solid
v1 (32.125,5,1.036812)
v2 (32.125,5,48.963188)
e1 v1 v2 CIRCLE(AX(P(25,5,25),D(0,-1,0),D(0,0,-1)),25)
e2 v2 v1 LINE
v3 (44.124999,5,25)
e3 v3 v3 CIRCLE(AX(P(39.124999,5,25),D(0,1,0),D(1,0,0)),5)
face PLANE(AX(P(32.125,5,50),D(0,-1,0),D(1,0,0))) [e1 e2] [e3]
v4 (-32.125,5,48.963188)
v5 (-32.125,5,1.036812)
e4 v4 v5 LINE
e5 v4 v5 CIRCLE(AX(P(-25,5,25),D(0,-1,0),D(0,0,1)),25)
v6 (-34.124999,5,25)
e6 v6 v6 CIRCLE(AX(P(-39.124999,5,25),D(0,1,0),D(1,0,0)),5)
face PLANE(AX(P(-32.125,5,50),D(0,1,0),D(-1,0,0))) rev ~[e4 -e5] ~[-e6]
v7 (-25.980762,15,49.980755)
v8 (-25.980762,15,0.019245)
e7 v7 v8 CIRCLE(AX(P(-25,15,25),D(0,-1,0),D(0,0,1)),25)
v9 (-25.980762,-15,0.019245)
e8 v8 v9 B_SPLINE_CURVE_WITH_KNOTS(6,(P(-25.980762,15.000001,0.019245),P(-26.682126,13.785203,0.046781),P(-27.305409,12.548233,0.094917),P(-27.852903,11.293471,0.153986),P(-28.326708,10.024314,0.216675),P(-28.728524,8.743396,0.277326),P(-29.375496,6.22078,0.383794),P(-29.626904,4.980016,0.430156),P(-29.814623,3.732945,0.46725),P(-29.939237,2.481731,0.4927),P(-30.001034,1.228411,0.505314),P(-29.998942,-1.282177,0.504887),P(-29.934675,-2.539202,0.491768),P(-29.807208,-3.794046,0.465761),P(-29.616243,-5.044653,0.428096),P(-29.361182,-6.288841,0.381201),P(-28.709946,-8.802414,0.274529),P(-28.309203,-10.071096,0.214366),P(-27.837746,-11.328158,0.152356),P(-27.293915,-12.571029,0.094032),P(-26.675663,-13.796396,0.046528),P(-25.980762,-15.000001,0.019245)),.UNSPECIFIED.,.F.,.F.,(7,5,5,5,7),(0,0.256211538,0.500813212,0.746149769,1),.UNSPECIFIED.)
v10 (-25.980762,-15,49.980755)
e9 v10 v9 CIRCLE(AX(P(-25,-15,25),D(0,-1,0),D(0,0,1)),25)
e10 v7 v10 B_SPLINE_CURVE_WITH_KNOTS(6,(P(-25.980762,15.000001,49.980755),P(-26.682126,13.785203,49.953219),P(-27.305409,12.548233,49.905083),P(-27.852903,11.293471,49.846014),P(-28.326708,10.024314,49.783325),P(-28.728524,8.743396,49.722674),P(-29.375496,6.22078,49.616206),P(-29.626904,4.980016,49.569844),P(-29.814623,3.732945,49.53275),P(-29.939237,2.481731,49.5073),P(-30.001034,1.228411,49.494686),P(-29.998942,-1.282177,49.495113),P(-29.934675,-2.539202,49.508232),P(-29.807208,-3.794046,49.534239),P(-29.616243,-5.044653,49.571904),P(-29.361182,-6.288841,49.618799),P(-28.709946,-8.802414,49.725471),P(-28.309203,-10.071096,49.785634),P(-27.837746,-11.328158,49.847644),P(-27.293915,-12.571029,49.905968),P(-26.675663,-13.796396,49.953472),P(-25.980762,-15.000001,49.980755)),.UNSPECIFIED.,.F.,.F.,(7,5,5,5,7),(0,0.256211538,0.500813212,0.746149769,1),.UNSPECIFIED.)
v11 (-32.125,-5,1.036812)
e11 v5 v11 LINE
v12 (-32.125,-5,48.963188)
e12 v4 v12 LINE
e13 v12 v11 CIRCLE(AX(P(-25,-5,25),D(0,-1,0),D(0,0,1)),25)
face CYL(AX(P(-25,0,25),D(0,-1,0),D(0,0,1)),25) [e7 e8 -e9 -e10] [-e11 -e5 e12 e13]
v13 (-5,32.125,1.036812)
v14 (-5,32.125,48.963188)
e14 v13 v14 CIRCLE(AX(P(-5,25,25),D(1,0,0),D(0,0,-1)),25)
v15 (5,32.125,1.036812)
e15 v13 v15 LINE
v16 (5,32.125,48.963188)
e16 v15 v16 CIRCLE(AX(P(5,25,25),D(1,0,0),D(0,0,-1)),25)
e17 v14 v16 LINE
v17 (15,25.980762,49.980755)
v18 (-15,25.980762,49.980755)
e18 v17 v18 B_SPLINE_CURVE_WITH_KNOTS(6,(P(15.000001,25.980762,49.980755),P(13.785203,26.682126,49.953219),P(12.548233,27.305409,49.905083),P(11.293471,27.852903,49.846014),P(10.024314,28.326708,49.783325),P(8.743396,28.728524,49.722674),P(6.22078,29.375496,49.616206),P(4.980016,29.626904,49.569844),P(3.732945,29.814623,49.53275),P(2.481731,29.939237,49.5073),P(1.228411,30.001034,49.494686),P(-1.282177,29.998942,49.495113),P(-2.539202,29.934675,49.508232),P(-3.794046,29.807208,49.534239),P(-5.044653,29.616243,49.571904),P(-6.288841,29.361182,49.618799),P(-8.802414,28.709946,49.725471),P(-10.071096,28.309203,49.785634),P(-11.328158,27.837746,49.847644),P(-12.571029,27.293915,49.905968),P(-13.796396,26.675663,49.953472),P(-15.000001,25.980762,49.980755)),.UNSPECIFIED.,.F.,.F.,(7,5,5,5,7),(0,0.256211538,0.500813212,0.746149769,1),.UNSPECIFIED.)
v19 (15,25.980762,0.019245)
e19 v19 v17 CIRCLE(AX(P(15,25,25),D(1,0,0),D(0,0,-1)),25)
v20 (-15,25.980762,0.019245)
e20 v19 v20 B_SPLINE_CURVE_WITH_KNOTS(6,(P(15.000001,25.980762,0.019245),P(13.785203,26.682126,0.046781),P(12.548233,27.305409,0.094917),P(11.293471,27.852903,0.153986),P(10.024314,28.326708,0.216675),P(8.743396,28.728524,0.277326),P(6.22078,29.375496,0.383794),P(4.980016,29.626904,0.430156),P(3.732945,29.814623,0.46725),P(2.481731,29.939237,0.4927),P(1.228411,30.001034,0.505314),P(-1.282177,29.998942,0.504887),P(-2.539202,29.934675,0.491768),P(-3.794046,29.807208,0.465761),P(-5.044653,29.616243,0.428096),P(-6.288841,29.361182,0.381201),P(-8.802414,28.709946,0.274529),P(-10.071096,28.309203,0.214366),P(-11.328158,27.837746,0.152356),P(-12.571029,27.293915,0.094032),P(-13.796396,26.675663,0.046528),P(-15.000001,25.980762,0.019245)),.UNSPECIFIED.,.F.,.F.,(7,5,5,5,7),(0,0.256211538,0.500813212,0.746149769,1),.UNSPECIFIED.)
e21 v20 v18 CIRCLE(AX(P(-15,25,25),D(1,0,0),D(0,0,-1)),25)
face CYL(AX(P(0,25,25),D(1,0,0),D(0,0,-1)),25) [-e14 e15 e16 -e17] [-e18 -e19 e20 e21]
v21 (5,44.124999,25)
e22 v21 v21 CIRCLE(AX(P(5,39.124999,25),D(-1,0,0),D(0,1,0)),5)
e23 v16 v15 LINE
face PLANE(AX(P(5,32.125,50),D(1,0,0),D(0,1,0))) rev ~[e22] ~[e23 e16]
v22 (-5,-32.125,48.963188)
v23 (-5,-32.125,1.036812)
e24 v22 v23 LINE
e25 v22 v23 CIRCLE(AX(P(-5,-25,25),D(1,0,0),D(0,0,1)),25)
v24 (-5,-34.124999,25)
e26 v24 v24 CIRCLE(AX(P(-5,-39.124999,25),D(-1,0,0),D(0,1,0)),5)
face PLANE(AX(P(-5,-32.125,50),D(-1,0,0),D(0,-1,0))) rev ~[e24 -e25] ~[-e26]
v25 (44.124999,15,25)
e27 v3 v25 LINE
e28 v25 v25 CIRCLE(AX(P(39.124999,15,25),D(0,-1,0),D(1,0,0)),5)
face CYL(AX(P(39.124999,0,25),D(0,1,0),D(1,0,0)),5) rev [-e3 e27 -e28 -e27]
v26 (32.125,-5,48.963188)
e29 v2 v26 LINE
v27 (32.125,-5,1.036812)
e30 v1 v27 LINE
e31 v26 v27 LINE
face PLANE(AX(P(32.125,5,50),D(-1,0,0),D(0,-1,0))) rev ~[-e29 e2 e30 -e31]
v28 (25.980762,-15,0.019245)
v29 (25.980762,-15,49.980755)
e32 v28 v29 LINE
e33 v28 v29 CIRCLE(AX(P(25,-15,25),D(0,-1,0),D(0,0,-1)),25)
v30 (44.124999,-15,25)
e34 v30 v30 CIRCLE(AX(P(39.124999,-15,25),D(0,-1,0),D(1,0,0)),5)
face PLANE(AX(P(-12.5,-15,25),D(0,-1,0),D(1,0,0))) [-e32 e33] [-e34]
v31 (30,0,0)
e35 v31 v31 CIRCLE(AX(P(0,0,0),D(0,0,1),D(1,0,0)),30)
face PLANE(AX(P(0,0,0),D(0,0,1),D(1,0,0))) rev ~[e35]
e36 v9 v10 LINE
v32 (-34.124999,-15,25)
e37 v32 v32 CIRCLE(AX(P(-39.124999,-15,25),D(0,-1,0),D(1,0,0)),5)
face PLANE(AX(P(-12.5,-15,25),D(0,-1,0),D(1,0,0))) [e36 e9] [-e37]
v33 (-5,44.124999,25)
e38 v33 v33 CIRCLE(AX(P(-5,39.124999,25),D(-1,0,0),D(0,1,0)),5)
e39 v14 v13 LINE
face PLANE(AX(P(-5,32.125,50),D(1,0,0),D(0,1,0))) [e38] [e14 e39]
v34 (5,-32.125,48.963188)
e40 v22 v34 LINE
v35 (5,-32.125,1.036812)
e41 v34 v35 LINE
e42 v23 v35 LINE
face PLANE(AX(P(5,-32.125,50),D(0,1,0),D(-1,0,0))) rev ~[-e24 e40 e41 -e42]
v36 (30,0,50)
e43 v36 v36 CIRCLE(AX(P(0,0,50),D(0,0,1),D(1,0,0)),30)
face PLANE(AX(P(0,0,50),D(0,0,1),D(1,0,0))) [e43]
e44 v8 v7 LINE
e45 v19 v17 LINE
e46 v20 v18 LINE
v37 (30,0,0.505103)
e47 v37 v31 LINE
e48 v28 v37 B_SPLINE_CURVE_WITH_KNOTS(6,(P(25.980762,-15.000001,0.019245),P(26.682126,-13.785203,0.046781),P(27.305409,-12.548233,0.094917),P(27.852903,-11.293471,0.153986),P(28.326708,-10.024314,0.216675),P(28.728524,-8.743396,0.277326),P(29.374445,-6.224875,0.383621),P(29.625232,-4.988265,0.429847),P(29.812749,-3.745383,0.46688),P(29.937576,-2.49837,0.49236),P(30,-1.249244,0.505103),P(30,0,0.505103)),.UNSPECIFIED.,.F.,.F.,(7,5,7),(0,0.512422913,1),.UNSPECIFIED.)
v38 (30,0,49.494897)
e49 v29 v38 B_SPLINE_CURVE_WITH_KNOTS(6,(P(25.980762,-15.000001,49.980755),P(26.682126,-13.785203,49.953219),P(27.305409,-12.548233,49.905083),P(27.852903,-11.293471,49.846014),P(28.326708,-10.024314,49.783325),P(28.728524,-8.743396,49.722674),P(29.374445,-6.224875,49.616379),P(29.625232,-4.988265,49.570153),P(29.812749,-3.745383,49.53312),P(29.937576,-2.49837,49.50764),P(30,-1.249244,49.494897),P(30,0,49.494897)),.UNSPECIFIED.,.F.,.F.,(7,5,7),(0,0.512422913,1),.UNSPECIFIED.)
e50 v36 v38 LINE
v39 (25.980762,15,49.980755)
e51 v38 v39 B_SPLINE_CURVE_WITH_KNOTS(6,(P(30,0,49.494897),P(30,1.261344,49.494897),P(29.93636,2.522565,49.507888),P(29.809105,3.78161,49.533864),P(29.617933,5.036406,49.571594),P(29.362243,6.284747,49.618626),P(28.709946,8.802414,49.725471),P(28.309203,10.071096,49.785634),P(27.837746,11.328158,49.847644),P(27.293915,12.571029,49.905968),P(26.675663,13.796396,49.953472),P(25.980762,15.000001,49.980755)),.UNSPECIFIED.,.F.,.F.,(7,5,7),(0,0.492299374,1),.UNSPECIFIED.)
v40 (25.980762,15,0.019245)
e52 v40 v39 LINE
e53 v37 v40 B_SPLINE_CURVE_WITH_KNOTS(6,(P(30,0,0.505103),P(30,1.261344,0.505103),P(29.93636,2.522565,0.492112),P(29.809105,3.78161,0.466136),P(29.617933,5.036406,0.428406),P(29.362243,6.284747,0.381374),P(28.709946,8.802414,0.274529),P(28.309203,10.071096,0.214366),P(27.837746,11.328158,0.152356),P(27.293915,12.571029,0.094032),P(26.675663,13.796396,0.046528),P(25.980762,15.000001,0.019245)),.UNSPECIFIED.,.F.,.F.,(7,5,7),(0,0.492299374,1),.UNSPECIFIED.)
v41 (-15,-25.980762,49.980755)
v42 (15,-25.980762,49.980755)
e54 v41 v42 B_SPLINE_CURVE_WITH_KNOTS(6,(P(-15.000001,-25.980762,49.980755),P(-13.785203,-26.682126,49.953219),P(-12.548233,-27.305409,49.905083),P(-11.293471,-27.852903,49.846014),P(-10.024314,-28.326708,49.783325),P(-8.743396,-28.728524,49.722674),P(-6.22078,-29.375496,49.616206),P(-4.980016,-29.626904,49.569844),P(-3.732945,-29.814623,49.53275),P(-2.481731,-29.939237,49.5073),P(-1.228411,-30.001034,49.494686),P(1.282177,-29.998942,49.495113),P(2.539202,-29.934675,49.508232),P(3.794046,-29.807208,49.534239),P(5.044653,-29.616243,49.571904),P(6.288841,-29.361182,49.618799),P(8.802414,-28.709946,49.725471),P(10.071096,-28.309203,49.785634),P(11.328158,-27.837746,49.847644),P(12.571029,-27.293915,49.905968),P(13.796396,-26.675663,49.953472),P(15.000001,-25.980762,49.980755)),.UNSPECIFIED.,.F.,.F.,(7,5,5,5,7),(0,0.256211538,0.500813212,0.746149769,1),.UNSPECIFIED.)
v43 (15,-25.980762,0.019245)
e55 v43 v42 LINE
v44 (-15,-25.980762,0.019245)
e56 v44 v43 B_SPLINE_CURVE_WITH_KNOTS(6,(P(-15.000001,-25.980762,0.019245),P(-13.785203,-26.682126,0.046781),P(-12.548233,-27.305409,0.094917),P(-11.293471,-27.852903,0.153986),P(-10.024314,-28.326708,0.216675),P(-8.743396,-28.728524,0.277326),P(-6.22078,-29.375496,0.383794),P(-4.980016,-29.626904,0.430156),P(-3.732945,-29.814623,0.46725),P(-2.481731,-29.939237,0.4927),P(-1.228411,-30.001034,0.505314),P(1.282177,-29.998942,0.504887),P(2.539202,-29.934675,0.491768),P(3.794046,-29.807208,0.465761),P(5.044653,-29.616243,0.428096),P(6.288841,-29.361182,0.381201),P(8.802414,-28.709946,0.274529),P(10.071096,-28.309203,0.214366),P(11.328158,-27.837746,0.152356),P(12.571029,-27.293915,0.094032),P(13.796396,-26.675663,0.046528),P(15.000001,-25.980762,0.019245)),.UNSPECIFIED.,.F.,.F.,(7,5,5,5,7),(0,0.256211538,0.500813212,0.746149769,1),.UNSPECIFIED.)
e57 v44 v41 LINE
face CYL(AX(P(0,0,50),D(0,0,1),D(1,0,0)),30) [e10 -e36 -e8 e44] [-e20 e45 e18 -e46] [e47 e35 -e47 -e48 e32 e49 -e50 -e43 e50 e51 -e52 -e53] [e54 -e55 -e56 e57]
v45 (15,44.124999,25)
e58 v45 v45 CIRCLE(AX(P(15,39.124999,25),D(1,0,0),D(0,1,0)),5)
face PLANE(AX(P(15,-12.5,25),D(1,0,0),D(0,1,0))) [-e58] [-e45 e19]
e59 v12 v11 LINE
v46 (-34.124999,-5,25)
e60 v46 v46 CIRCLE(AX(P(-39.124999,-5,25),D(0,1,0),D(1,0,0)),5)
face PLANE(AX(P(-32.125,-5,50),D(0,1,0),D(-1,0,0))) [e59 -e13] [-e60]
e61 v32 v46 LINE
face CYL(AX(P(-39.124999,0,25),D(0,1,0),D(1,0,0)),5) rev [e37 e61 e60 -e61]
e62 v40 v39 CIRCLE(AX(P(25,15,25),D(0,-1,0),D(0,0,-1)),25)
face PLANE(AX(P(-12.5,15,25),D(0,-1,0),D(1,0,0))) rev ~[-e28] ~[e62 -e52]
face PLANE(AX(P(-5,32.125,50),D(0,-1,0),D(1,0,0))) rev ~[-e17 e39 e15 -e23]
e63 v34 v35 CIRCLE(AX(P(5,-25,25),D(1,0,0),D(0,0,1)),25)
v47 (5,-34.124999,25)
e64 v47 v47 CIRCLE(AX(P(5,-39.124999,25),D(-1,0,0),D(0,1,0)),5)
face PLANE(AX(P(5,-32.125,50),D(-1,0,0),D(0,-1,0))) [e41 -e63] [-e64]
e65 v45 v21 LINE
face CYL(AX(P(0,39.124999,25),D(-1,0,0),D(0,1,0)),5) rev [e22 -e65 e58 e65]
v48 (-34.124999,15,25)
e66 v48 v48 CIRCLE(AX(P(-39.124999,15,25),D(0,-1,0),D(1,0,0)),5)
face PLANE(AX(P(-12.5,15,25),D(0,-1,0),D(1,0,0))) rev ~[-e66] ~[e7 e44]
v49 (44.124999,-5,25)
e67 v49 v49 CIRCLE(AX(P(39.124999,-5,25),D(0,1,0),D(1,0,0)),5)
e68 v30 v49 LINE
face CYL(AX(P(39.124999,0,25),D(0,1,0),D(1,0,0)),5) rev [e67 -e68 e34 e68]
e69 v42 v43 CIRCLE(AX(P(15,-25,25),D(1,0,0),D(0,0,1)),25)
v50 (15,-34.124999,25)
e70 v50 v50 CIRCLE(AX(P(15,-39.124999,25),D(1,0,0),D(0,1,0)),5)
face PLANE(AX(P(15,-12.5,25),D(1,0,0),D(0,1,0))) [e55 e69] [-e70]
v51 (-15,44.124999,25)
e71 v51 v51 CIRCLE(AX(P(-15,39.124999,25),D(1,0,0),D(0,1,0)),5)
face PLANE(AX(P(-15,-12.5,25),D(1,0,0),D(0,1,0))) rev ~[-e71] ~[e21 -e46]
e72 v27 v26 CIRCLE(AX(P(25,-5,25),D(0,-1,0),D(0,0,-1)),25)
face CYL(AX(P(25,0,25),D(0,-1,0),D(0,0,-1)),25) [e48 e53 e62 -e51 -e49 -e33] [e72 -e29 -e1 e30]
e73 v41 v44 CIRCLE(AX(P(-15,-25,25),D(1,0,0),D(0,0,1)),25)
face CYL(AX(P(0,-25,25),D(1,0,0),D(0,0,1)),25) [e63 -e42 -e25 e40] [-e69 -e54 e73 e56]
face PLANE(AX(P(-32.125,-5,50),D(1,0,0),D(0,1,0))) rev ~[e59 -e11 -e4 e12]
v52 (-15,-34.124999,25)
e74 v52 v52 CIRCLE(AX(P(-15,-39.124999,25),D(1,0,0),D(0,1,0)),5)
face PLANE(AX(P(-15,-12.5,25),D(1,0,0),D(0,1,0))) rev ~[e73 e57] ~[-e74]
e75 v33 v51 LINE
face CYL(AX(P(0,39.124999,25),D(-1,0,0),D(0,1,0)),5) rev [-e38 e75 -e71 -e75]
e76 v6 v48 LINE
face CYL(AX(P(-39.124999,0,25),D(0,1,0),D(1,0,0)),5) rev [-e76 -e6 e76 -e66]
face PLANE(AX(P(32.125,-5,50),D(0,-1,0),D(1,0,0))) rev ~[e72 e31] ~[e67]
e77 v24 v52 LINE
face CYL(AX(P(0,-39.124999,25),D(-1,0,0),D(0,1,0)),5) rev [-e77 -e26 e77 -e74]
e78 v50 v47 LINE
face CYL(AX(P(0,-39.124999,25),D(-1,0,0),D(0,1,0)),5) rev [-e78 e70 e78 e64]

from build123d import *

# Parameters (mm, degrees)
F0_W            = 25
F0_H            = 50
F0_R            = 5
F1_DEPTH        = 15
F1_DEPTH_BACK   = 15
F2_COUNT        = 2
F2_ANGLE        = 90
F3_R            = 30
F4_DEPTH        = 50
F5_W            = 10
F5_H            = 64.0000030398
F6_DEPTH        = 50.0010001
F6_COPIES_COUNT = 4


# Not quite as in the source:
# - a pattern or mirror of a feature is missing from the dataset's text; its kind, count and spacing are read off the source's solid


with BuildPart() as f1:
    # F0 (on Front) → F1 (new body, two sides)
    with BuildSketch(Plane.XZ) as f1_sk:
        with Locations((-12.5, 25)):
            Rectangle(F0_W, F0_H)
        with Locations((12.5, 25)):
            Rectangle(F0_W, F0_H)
        with BuildLine():
            ThreePointArc((-25, 50), (-50, 25), (-25, 0))
            Line((-25, 0), (-25, 50))
        make_face()
        with Locations((-39.1249991953, 25)):
            Circle(F0_R, mode=Mode.SUBTRACT)
        with BuildLine():
            Line((25, 50), (25, 0))
            ThreePointArc((25, 0), (50, 25), (25, 50))
        make_face()
        with Locations((39.1249991953, 25)):
            Circle(F0_R, mode=Mode.SUBTRACT)
    extrude(amount=F1_DEPTH)
    extrude(f1_sk.sketch, amount=-F1_DEPTH_BACK)

    # F2: F1 ×2 about axis
    f2_axis = Axis((0, 0, 10.6249991804), (0, 0, 1))


with BuildPart() as f1_1:
    add(f1.part)
    for i in range(1, F2_COUNT):
        add(f1.part.rotate(f2_axis, i * F2_ANGLE / (F2_COUNT - 1)))

    # F3 (on face) → F4 (join, through all)
    with BuildSketch(Plane.XY.offset(50)):
        Circle(F3_R)
    extrude(amount=-F4_DEPTH)

    # F5 (on face) → F6 (cut, through all)
    with BuildSketch(Plane.XY.offset(50)):
        with Locations((0, 64.1250014305)):
            Rectangle(F5_W, F5_H)
    f6 = extrude(amount=-F6_DEPTH, mode=Mode.SUBTRACT)

    # F6_copies: F6 ×4 about axis
    f6_copies_axis = Axis((0, 0, 0), (0, 0, 1))
    for i in range(1, F6_COPIES_COUNT):
        add(f6.rotate(f6_copies_axis, i * 360 / F6_COPIES_COUNT), mode=Mode.SUBTRACT)


solid = f1_1.part
